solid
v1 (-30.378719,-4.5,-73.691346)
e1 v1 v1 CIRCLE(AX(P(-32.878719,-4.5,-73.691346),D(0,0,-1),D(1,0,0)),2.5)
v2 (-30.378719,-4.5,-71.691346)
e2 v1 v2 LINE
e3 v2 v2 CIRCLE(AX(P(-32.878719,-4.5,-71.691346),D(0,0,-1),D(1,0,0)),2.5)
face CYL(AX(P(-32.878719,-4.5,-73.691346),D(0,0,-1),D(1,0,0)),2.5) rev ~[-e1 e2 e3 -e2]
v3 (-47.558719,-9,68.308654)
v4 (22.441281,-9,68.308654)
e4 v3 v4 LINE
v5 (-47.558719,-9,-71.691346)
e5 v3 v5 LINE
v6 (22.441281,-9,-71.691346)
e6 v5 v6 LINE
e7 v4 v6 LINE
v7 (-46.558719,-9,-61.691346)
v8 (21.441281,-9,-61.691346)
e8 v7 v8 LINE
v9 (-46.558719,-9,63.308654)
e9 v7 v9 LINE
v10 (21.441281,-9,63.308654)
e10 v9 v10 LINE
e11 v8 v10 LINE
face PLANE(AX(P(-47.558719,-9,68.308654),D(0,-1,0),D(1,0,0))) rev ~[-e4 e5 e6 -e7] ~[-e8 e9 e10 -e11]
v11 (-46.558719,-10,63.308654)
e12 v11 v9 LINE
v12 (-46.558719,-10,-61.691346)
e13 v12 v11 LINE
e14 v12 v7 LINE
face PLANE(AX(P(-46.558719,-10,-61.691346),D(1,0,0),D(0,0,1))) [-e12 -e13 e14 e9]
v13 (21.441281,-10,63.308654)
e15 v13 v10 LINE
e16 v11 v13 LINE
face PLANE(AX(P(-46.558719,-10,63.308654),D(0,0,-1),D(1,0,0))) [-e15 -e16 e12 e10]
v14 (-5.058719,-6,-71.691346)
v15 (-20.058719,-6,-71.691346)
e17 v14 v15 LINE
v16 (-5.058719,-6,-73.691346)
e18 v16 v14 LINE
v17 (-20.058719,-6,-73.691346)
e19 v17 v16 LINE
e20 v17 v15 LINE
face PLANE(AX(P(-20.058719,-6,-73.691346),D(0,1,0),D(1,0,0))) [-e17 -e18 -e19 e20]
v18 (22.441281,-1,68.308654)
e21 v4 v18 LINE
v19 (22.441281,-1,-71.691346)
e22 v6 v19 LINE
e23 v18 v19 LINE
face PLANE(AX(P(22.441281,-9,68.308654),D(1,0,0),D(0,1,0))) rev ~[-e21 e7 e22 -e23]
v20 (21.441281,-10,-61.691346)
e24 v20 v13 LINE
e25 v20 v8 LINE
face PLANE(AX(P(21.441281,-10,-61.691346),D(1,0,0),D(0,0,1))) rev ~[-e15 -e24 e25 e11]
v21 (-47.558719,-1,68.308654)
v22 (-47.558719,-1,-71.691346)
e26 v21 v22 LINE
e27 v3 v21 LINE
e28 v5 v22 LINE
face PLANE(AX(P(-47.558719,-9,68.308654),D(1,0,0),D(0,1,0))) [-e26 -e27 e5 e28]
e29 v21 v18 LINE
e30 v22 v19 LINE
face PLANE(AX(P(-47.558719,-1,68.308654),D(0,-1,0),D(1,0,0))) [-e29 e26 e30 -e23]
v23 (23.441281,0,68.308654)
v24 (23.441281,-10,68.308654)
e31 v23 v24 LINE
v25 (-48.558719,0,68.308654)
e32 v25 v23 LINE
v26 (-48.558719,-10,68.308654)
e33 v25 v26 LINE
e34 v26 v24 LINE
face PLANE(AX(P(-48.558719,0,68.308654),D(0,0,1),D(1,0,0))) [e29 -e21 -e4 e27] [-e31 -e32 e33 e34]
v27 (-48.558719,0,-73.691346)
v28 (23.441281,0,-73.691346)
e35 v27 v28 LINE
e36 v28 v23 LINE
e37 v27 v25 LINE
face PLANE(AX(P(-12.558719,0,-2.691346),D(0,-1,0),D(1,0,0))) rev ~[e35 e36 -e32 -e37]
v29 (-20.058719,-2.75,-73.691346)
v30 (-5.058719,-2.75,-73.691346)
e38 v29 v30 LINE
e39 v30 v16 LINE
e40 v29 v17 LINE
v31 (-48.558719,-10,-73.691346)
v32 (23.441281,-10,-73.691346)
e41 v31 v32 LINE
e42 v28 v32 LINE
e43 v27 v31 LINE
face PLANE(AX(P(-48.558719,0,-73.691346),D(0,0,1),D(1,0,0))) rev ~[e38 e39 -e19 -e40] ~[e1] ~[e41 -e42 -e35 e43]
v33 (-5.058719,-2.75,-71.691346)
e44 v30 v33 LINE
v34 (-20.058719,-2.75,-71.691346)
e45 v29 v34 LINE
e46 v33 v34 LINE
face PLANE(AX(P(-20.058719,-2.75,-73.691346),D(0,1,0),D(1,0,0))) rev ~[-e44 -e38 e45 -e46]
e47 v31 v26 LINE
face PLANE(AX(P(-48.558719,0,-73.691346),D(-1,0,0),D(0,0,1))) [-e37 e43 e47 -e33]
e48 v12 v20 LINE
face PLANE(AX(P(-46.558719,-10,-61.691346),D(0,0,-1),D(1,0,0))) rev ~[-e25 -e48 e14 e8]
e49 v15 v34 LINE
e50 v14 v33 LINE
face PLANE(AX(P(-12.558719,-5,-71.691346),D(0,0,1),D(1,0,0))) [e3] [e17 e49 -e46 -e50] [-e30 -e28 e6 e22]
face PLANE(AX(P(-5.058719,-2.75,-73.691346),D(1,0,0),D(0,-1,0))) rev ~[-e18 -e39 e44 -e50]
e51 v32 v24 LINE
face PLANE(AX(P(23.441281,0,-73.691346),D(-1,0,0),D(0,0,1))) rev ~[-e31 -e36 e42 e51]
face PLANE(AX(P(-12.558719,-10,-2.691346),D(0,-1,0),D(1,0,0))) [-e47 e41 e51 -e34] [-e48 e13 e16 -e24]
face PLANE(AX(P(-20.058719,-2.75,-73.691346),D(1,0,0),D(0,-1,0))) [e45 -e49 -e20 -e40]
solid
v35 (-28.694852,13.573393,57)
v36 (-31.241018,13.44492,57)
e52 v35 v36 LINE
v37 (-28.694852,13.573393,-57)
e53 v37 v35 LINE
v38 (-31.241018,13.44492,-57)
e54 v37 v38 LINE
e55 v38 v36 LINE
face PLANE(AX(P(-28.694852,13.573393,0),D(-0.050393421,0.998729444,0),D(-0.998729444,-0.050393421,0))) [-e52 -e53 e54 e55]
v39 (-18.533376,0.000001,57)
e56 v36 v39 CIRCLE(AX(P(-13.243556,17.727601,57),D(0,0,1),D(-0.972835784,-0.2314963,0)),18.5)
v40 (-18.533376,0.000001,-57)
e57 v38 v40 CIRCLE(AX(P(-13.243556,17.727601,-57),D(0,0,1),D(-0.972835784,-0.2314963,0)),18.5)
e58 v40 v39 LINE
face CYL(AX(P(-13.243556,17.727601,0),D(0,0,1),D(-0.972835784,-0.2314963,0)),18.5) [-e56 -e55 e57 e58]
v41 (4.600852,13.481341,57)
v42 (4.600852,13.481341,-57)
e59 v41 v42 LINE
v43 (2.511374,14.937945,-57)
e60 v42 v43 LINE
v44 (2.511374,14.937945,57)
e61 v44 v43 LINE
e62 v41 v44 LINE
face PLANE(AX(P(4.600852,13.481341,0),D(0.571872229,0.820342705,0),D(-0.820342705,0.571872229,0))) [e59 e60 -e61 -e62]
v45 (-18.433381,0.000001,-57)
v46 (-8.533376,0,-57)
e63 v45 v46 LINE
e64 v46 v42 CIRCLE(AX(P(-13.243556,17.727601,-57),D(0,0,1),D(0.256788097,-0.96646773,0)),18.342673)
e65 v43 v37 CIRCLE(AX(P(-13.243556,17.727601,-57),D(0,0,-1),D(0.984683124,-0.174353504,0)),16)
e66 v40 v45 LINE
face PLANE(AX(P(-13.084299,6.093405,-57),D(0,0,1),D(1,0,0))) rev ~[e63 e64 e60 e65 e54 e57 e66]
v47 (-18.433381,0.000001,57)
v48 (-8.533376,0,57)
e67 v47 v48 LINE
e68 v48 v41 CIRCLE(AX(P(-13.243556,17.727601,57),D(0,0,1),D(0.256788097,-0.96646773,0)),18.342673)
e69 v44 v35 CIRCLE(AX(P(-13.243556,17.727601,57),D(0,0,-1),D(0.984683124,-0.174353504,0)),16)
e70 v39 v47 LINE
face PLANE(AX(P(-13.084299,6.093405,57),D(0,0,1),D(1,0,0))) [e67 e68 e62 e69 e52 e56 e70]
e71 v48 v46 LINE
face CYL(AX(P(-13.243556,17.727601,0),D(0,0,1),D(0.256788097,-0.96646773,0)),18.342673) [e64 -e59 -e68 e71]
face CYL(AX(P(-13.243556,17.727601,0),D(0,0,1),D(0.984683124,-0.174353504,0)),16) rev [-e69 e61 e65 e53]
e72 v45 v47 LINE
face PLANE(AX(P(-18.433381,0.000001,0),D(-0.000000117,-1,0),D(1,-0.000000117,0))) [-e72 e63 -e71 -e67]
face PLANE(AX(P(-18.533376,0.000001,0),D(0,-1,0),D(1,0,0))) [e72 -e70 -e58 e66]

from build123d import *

# Parameters (mm, degrees)
F0_W     = 72
F0_H     = 142
F1_DEPTH = 10
F2_W     = 70
F2_H     = 8
F3_DEPTH = 140
F4_W     = 68
F4_H     = 125
F5_DEPTH = 4
F6_W     = 15
F6_H     = 3.25
F6_R     = 2.5
F7_DEPTH = 5
F9_DEPTH = 57


# Not quite as in the source:
# - ends of sketch curves that miss each other by under 0.0002 mm in the source are joined


with BuildPart() as f1:
    # F0 (on Front) → F1 (new body)
    with BuildSketch(Plane.XZ):
        with Locations((-12.5587194562, -2.6913457513)):
            Rectangle(F0_W, F0_H)
    extrude(amount=F1_DEPTH)

    # F2 (on face) → F3 (cut)
    with BuildSketch(Plane.XY.offset(68.3086542487)):
        with Locations((-12.5587194562, -5)):
            Rectangle(F2_W, F2_H)
    extrude(amount=-F3_DEPTH, mode=Mode.SUBTRACT)

    # F4 (on face) → F5 (cut)
    with BuildSketch(Plane.XZ.offset(10)):
        with Locations((-12.5587194562, 0.8086542487)):
            Rectangle(F4_W, F4_H)
    extrude(amount=-F5_DEPTH, mode=Mode.SUBTRACT)

    # F6 (on face) → F7 (cut)
    with BuildSketch(Plane(origin=(0, 0, -73.6913457513), x_dir=(1, 0, 0), z_dir=(0, 0, -1))):
        with Locations((-12.5587194562, 4.375)):
            Rectangle(F6_W, F6_H)
        with Locations((-32.8787194562, 4.5)):
            Circle(F6_R)
    extrude(amount=-F7_DEPTH, mode=Mode.SUBTRACT)


with BuildPart() as f9:
    # F8 (on Top) → F9 (new body, symmetric)
    with BuildSketch(Plane.XY):
        with BuildLine():
            ThreePointArc((7.7113736967, 14.9379451755), (-7.3445934288, 1.7428756888), (-23.4948524625, 13.5733929211))
            Line((-23.4948524625, 13.5733929211), (-26.0410183017, 13.4449196816))
            ThreePointArc((-26.0410183017, 13.4449196816), (-21.4884748179, 5.0199592107), (-13.3333762735, 1.1589e-06))
            Line((-13.3333762735, 1.1589e-06), (-13.2333813235, 1.1589e-06))
            Line((-13.2333813235, 1.1589e-06), (-3.3333762735, 0))
            ThreePointArc((-3.3333762735, 0), (5.0947085652, 4.9276153802), (9.8008521931, 13.4813408573))
            Line((9.8008521931, 13.4813408573), (7.7113736967, 14.9379451755))
        make_face()
    extrude(amount=F9_DEPTH, both=True)


with BuildPart() as f9_1:
    # F10: moved
    add(f9.part.moved(Location((-5.2, 0, 0))))


solid = Compound([f1.part, f9_1.part])
